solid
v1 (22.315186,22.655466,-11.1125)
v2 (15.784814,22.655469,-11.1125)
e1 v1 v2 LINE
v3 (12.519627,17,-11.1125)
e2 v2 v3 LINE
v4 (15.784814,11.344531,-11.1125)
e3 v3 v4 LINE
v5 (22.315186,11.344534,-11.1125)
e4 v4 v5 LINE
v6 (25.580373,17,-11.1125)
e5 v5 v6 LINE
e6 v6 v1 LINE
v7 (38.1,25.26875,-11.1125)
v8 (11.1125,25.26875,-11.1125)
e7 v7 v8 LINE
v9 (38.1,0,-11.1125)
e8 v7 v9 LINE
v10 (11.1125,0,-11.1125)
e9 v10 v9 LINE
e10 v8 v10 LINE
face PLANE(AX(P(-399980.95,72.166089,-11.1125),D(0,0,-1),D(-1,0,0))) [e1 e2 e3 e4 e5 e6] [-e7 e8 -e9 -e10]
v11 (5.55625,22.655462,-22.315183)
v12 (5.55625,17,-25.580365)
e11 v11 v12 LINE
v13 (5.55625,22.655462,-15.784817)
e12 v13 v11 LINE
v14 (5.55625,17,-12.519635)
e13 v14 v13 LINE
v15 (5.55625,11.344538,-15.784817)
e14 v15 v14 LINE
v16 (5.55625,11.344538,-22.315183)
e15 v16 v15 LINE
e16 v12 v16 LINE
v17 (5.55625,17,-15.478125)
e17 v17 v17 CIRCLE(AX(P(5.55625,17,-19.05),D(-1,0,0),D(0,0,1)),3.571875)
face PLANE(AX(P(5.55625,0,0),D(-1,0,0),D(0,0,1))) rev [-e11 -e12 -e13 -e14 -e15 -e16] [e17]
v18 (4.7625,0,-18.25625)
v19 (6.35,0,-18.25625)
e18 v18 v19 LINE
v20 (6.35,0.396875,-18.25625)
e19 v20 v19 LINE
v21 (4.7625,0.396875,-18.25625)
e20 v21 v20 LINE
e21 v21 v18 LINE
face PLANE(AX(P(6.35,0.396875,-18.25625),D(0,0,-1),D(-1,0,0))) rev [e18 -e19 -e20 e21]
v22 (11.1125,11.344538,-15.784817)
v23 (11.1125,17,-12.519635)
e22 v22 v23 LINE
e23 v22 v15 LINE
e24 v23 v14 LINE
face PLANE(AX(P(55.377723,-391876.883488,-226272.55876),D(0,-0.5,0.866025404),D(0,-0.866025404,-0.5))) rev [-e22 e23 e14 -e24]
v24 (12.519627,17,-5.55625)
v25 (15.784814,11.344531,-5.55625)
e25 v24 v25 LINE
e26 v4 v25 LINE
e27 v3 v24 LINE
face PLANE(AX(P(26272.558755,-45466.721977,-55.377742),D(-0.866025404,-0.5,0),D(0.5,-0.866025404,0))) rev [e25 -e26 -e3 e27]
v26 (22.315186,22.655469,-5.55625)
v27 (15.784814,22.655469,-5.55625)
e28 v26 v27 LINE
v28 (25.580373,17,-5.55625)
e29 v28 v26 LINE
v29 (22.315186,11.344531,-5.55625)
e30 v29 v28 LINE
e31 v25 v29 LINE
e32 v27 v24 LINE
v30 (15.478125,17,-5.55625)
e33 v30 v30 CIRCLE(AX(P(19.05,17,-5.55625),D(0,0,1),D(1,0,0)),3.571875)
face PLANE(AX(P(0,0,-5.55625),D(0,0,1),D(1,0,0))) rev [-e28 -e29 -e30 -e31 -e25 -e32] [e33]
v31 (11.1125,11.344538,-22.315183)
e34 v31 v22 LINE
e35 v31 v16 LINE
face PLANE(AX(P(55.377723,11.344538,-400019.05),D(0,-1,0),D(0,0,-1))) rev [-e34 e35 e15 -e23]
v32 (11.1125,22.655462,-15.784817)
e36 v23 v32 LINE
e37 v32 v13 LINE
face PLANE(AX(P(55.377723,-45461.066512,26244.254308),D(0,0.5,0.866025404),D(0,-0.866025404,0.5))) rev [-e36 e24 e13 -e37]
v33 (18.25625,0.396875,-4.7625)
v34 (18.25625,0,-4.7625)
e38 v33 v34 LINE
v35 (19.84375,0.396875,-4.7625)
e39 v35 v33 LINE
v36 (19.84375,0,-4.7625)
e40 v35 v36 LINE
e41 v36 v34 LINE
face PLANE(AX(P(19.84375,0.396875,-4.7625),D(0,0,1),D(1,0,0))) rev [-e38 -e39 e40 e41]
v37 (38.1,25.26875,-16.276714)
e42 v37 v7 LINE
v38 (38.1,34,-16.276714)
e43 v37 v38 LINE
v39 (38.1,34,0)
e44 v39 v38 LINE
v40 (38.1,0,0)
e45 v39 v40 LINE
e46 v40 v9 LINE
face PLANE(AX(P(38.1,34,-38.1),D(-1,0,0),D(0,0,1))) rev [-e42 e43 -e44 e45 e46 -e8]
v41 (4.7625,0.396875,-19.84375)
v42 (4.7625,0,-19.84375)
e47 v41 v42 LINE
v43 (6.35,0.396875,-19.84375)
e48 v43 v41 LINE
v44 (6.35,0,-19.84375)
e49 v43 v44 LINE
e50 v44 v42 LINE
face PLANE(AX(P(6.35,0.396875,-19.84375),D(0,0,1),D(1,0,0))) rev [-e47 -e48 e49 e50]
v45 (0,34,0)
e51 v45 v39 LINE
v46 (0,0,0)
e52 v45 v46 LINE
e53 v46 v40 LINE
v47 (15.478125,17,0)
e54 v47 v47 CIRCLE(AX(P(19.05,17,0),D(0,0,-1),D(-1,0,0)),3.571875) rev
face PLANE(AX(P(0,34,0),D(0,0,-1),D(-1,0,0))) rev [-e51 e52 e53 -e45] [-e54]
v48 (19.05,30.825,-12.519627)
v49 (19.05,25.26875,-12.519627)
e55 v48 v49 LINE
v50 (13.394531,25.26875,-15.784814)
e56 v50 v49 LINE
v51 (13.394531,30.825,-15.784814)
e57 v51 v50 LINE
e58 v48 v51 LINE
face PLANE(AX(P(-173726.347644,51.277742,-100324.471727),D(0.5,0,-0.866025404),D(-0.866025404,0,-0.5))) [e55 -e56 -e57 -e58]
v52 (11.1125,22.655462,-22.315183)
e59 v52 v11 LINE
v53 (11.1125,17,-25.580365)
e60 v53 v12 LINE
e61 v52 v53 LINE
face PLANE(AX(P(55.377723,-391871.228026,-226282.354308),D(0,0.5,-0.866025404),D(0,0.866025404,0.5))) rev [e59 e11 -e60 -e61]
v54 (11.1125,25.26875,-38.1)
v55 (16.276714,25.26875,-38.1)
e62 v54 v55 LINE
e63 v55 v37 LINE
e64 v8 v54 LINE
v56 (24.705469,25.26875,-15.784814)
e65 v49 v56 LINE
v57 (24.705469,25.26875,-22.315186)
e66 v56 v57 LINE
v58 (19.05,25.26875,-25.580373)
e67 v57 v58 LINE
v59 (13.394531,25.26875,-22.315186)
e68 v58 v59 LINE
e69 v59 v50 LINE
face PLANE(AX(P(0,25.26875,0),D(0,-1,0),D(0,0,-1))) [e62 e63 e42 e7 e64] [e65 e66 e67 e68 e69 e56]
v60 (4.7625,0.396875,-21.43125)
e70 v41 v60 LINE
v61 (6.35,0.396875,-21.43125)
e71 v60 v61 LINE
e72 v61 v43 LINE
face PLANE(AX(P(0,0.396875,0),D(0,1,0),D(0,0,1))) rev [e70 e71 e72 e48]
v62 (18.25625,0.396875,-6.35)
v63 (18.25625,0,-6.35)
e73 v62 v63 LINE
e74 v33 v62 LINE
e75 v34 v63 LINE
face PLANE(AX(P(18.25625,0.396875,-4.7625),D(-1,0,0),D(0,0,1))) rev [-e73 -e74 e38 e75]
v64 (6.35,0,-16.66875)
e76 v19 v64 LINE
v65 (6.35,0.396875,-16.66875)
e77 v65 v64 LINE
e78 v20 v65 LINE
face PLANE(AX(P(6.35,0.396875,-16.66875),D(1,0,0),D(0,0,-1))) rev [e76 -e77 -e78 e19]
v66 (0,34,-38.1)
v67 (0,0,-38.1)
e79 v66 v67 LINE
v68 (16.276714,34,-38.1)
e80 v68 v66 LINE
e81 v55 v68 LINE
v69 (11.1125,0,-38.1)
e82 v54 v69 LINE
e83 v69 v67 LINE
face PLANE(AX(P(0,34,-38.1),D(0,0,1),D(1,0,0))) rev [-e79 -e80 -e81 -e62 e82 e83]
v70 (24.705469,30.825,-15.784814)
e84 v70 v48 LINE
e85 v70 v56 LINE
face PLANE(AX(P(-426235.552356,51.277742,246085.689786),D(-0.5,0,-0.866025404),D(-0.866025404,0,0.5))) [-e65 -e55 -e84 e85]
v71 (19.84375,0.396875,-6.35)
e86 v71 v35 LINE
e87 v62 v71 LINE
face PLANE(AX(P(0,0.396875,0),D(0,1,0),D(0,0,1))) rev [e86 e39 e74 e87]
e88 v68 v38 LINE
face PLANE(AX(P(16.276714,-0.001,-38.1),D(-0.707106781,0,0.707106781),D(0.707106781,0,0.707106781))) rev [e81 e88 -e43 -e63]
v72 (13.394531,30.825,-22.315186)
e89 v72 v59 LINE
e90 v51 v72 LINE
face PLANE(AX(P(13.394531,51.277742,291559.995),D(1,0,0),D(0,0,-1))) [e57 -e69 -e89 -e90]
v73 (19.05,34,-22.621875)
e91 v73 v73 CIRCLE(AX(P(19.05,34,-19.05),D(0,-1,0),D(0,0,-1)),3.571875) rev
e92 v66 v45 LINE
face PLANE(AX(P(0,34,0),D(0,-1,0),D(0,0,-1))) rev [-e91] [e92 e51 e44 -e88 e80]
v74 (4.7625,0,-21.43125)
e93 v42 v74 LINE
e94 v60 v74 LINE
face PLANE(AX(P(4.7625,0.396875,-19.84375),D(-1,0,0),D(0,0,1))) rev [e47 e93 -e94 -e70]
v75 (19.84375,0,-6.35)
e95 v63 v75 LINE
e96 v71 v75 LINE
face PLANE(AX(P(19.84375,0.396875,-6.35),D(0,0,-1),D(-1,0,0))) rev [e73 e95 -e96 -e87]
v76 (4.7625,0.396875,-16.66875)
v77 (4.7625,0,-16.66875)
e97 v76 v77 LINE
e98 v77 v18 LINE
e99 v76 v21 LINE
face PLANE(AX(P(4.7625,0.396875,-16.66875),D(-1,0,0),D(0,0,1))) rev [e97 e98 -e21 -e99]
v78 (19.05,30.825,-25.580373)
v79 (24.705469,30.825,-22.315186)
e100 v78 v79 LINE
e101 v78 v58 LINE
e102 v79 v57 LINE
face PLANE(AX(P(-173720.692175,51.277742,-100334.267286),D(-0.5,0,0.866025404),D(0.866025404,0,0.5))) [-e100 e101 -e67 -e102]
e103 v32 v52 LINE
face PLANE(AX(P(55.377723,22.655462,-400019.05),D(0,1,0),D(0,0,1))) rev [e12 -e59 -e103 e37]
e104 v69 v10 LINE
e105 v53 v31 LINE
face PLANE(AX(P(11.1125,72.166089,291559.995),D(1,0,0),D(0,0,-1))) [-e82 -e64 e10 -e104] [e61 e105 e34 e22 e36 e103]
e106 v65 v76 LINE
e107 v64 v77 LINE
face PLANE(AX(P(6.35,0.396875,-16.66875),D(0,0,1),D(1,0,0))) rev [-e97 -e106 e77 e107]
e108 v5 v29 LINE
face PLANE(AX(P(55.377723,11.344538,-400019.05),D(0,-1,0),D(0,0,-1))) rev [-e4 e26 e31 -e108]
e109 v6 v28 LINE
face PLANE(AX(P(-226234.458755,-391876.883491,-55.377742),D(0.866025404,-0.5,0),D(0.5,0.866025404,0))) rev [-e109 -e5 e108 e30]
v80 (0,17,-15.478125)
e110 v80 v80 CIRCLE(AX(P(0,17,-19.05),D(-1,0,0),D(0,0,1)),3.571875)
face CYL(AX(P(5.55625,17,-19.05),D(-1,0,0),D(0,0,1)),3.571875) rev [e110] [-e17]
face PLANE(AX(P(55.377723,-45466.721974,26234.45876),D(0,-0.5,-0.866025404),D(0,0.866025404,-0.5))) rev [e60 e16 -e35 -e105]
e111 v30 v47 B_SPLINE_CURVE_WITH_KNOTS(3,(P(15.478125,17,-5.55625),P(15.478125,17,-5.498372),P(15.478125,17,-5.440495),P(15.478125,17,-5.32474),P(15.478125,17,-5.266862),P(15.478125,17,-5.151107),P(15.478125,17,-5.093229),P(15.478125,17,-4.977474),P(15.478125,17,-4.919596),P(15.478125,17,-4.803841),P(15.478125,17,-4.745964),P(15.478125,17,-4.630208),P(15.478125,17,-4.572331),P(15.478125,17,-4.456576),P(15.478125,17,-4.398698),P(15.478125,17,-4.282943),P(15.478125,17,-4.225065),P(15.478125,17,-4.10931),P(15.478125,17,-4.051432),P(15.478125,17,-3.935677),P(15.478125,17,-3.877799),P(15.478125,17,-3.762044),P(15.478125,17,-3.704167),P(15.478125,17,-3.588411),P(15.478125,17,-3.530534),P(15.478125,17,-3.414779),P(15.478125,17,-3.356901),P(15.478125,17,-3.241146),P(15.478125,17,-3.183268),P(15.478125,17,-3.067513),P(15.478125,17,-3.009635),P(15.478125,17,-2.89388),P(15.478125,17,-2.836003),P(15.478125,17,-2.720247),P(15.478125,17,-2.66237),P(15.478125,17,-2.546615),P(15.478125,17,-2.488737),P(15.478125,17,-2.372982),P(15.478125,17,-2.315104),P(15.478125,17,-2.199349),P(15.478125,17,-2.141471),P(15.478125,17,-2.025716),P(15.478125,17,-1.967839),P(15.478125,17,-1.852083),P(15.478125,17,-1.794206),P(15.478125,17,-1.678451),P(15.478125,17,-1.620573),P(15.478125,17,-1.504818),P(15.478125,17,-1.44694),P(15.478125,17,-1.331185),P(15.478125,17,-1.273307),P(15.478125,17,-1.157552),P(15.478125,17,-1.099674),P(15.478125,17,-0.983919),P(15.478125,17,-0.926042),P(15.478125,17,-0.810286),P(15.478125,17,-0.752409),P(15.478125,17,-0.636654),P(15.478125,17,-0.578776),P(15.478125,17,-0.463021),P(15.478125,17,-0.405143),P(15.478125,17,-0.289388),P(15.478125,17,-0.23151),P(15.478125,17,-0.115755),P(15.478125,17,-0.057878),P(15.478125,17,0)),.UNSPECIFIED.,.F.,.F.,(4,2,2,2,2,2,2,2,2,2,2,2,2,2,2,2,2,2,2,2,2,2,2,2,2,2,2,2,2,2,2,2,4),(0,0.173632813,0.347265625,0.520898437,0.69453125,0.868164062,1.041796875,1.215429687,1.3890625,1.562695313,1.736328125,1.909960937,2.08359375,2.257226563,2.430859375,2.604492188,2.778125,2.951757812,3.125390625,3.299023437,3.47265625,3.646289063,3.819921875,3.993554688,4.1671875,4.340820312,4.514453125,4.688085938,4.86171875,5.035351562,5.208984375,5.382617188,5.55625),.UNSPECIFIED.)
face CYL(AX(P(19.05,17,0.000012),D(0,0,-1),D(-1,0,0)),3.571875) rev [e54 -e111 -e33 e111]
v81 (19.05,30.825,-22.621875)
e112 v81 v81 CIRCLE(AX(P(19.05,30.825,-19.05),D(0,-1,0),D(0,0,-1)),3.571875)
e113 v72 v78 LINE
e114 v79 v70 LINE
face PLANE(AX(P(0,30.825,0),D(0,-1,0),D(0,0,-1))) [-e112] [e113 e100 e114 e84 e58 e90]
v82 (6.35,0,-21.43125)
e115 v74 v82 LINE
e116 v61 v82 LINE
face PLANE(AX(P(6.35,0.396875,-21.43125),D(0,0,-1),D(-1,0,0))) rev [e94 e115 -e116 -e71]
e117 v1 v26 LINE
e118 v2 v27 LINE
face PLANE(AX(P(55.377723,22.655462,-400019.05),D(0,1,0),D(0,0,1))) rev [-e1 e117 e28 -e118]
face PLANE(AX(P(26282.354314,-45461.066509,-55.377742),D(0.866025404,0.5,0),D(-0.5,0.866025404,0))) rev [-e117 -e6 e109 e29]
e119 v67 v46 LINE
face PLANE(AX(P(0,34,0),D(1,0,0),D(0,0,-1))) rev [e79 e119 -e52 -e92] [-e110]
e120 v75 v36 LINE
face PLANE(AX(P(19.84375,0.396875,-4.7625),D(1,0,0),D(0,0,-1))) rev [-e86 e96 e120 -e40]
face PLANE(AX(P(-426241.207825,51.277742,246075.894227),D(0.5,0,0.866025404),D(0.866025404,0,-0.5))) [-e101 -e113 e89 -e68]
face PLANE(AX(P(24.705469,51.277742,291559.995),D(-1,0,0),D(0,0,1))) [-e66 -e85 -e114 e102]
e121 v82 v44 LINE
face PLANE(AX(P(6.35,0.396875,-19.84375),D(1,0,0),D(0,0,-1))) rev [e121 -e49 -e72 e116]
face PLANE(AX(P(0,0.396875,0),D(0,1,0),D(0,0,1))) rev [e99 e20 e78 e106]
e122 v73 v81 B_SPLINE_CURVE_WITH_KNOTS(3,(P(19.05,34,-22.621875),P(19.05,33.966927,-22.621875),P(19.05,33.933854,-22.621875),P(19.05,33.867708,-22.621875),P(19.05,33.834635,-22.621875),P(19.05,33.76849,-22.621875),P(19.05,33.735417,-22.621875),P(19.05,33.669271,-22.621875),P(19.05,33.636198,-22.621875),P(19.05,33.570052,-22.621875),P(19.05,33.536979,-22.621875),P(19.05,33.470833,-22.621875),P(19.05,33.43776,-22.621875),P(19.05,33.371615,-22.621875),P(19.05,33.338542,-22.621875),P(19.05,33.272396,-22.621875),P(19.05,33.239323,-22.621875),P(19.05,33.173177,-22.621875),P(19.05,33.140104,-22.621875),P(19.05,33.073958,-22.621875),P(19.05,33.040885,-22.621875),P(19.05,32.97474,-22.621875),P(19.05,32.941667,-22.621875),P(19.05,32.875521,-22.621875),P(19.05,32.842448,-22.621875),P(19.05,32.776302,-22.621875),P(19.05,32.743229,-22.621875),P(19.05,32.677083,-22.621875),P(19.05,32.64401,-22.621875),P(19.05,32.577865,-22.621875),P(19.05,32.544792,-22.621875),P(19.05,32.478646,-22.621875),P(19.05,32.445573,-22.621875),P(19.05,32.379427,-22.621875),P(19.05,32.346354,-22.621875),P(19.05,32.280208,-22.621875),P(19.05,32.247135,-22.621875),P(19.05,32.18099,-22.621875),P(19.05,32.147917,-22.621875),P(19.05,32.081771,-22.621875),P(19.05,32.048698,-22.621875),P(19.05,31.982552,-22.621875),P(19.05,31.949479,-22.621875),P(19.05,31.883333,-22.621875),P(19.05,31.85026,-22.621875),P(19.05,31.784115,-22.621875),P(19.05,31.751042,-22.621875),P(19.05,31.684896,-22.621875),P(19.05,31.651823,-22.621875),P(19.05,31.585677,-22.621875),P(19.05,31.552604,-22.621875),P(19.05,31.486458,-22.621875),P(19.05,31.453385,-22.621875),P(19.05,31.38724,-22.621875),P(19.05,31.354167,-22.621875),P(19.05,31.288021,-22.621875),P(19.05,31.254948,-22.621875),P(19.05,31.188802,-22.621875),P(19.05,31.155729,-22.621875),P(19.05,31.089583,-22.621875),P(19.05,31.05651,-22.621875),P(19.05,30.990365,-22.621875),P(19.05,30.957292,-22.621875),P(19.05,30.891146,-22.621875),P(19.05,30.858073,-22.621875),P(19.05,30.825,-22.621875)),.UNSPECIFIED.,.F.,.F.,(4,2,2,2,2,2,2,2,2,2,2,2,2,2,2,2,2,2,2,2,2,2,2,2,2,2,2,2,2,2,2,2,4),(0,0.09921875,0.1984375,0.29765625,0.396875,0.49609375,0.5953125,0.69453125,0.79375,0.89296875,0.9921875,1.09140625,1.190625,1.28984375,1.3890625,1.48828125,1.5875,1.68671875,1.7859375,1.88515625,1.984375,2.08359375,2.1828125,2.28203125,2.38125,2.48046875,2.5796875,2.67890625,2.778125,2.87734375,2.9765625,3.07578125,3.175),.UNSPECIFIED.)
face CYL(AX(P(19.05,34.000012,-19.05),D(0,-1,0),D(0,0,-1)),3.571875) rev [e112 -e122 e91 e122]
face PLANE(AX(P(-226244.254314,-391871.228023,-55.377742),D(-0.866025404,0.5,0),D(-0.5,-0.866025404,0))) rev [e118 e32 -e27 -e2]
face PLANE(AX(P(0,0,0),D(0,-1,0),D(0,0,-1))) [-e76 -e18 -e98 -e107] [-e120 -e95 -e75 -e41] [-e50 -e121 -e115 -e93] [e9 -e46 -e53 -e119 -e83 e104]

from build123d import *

# Parameters (mm, degrees)
SKETCH1_W                    = 38.1
SKETCH1_H                    = 38.1
MAIN_BODY_DEPTH              = 34
F_9_32_RIGHT_RAIL_DEPTH      = 64.712008287
F_9_32_RIGHT_RAIL_DEPTH_BACK = 5.55625
SKETCH3_R                    = 3.571875
SKETCH4_R                    = 3.571875
F_9_32_LEFT_RAIL_DEPTH       = 5.55625
F_9_32_TOPPER_DEPTH          = 64.712008287
F_9_32_TOPPER_DEPTH_BACK     = 10
SKETCH8_R                    = 3.571875
HEX_START                    = -5.55625
HEX_HOLE_RIGHT_DEPTH         = 32.54375
HEX_HOLE_LEFT_DEPTH          = 32.54375
INNER_START                  = -34
INNER_CAVITY_OUTLINE_W       = 26.9875
INNER_CAVITY_OUTLINE_H       = 26.9875
INNER_CAVITY_DEPTH           = 25.26875
HEX_START_2                  = -17
HEX_HOLE_TOP_DEPTH           = 13.825
TOP_CORNER_REACH             = 65.712
SKETCH17_W                   = 1.5875
SKETCH17_H                   = 1.5875
CUT_EXTRUDE1_DEPTH           = 0.396875


# Read off the part's stored shape, not the designer's step: Inner Cavity
with BuildPart() as part:
    # Sketch1 → Main Body (new body)
    with BuildSketch(Plane(origin=(0, 0, 0), x_dir=(1, 0, 0), z_dir=(0, 1, 0))):
        with Locations((19.05, 19.05)):
            Rectangle(SKETCH1_W, SKETCH1_H)
    extrude(amount=MAIN_BODY_DEPTH)

    # Sketch3 → 9/32 Right Rail (cut, two sides: drawn at the far end of the back side and taken through both)
    with BuildSketch(Plane.XY.offset(-F_9_32_RIGHT_RAIL_DEPTH_BACK)):
        with Locations(Location((19.05, 17, 0), (0, 0, 180))):
            Circle(SKETCH3_R)
    extrude(amount=F_9_32_RIGHT_RAIL_DEPTH + F_9_32_RIGHT_RAIL_DEPTH_BACK, mode=Mode.SUBTRACT)

    # Sketch4 → 9/32 Left Rail (cut)
    with BuildSketch(Plane.ZY):
        with Locations((-19.05, 17)):
            Circle(SKETCH4_R)
    extrude(amount=-F_9_32_LEFT_RAIL_DEPTH, mode=Mode.SUBTRACT)

    # Sketch8 → 9/32 Topper (cut, two sides: drawn at the far end of the back side and taken through both)
    with BuildSketch(Plane(origin=(0, 34, 0), x_dir=(1, 0, 0), z_dir=(0, 1, 0)).offset(-F_9_32_TOPPER_DEPTH_BACK)):
        with Locations(Location((19.05, 19.05, 0), (0, 0, 90))):
            Circle(SKETCH8_R)
    extrude(amount=F_9_32_TOPPER_DEPTH + F_9_32_TOPPER_DEPTH_BACK, mode=Mode.SUBTRACT)

    # Sketch9 → Hex Hole Right (cut)
    with BuildSketch(Plane.ZY.offset(HEX_START)):
        Polygon((-22.315182739, 22.6554624), (-25.580365478, 17), (-22.315182739, 11.3445376), (-15.784817261, 11.3445376), (-12.519634522, 17), (-15.784817261, 22.6554624), align=None)
    extrude(amount=-HEX_HOLE_RIGHT_DEPTH, mode=Mode.SUBTRACT)

    # Sketch10 → Hex Hole Left (cut)
    with BuildSketch(Plane.XY.offset(HEX_START)):
        Polygon((15.784813595, 22.65546875), (12.51962719, 17), (15.784813595, 11.34453125), (22.315186405, 11.34453125), (25.58037281, 17), (22.315186405, 22.65546875), align=None)
    extrude(amount=-HEX_HOLE_LEFT_DEPTH, mode=Mode.SUBTRACT)

    # Inner Cavity outline → Inner Cavity (cut)
    with BuildSketch(Plane(origin=(0, 34, 0), x_dir=(1, 0, 0), z_dir=(0, 1, 0)).offset(INNER_START)):
        with Locations((24.60625, 24.60625)):
            Rectangle(INNER_CAVITY_OUTLINE_W, INNER_CAVITY_OUTLINE_H)
    extrude(amount=INNER_CAVITY_DEPTH, mode=Mode.SUBTRACT)

    # Sketch14 → Hex Hole Top (cut)
    with BuildSketch(Plane(origin=(0, 34, 0), x_dir=(1, 0, 0), z_dir=(0, 1, 0)).offset(HEX_START_2)):
        Polygon((24.70546875, 22.315186405), (19.05, 25.58037281), (13.39453125, 22.315186405), (13.39453125, 15.784813595), (19.05, 12.51962719), (24.70546875, 15.784813595), align=None)
    extrude(amount=HEX_HOLE_TOP_DEPTH, mode=Mode.SUBTRACT)

    # Sketch16 → Top Corner (cut, up to next)
    with BuildSketch(Plane(origin=(0, 34, 0), x_dir=(1, 0, 0), z_dir=(0, 1, 0)), mode=Mode.PRIVATE) as top_corner_sk1:
        Polygon((38.1, 38.1), (16.276714219, 38.1), (38.1, 16.276714219), align=None)
    top_corner_tool1 = extrude(top_corner_sk1.sketch, amount=-TOP_CORNER_REACH, mode=Mode.PRIVATE) & part.part
    add(top_corner_tool1.solids().sort_by_distance((30.825571, 34, -30.825571))[0], mode=Mode.SUBTRACT)

    # Sketch17 → Cut-Extrude1 (cut)
    with BuildSketch(Plane.XZ):
        with Locations((19.05, -5.55625)):
            Rectangle(SKETCH17_W, SKETCH17_H)
        with Locations((5.55625, -17.4625)):
            Rectangle(SKETCH17_W, SKETCH17_H)
        with Locations((5.55625, -20.6375)):
            Rectangle(SKETCH17_W, SKETCH17_H)
    extrude(amount=-CUT_EXTRUDE1_DEPTH, mode=Mode.SUBTRACT)


solid = part.part
